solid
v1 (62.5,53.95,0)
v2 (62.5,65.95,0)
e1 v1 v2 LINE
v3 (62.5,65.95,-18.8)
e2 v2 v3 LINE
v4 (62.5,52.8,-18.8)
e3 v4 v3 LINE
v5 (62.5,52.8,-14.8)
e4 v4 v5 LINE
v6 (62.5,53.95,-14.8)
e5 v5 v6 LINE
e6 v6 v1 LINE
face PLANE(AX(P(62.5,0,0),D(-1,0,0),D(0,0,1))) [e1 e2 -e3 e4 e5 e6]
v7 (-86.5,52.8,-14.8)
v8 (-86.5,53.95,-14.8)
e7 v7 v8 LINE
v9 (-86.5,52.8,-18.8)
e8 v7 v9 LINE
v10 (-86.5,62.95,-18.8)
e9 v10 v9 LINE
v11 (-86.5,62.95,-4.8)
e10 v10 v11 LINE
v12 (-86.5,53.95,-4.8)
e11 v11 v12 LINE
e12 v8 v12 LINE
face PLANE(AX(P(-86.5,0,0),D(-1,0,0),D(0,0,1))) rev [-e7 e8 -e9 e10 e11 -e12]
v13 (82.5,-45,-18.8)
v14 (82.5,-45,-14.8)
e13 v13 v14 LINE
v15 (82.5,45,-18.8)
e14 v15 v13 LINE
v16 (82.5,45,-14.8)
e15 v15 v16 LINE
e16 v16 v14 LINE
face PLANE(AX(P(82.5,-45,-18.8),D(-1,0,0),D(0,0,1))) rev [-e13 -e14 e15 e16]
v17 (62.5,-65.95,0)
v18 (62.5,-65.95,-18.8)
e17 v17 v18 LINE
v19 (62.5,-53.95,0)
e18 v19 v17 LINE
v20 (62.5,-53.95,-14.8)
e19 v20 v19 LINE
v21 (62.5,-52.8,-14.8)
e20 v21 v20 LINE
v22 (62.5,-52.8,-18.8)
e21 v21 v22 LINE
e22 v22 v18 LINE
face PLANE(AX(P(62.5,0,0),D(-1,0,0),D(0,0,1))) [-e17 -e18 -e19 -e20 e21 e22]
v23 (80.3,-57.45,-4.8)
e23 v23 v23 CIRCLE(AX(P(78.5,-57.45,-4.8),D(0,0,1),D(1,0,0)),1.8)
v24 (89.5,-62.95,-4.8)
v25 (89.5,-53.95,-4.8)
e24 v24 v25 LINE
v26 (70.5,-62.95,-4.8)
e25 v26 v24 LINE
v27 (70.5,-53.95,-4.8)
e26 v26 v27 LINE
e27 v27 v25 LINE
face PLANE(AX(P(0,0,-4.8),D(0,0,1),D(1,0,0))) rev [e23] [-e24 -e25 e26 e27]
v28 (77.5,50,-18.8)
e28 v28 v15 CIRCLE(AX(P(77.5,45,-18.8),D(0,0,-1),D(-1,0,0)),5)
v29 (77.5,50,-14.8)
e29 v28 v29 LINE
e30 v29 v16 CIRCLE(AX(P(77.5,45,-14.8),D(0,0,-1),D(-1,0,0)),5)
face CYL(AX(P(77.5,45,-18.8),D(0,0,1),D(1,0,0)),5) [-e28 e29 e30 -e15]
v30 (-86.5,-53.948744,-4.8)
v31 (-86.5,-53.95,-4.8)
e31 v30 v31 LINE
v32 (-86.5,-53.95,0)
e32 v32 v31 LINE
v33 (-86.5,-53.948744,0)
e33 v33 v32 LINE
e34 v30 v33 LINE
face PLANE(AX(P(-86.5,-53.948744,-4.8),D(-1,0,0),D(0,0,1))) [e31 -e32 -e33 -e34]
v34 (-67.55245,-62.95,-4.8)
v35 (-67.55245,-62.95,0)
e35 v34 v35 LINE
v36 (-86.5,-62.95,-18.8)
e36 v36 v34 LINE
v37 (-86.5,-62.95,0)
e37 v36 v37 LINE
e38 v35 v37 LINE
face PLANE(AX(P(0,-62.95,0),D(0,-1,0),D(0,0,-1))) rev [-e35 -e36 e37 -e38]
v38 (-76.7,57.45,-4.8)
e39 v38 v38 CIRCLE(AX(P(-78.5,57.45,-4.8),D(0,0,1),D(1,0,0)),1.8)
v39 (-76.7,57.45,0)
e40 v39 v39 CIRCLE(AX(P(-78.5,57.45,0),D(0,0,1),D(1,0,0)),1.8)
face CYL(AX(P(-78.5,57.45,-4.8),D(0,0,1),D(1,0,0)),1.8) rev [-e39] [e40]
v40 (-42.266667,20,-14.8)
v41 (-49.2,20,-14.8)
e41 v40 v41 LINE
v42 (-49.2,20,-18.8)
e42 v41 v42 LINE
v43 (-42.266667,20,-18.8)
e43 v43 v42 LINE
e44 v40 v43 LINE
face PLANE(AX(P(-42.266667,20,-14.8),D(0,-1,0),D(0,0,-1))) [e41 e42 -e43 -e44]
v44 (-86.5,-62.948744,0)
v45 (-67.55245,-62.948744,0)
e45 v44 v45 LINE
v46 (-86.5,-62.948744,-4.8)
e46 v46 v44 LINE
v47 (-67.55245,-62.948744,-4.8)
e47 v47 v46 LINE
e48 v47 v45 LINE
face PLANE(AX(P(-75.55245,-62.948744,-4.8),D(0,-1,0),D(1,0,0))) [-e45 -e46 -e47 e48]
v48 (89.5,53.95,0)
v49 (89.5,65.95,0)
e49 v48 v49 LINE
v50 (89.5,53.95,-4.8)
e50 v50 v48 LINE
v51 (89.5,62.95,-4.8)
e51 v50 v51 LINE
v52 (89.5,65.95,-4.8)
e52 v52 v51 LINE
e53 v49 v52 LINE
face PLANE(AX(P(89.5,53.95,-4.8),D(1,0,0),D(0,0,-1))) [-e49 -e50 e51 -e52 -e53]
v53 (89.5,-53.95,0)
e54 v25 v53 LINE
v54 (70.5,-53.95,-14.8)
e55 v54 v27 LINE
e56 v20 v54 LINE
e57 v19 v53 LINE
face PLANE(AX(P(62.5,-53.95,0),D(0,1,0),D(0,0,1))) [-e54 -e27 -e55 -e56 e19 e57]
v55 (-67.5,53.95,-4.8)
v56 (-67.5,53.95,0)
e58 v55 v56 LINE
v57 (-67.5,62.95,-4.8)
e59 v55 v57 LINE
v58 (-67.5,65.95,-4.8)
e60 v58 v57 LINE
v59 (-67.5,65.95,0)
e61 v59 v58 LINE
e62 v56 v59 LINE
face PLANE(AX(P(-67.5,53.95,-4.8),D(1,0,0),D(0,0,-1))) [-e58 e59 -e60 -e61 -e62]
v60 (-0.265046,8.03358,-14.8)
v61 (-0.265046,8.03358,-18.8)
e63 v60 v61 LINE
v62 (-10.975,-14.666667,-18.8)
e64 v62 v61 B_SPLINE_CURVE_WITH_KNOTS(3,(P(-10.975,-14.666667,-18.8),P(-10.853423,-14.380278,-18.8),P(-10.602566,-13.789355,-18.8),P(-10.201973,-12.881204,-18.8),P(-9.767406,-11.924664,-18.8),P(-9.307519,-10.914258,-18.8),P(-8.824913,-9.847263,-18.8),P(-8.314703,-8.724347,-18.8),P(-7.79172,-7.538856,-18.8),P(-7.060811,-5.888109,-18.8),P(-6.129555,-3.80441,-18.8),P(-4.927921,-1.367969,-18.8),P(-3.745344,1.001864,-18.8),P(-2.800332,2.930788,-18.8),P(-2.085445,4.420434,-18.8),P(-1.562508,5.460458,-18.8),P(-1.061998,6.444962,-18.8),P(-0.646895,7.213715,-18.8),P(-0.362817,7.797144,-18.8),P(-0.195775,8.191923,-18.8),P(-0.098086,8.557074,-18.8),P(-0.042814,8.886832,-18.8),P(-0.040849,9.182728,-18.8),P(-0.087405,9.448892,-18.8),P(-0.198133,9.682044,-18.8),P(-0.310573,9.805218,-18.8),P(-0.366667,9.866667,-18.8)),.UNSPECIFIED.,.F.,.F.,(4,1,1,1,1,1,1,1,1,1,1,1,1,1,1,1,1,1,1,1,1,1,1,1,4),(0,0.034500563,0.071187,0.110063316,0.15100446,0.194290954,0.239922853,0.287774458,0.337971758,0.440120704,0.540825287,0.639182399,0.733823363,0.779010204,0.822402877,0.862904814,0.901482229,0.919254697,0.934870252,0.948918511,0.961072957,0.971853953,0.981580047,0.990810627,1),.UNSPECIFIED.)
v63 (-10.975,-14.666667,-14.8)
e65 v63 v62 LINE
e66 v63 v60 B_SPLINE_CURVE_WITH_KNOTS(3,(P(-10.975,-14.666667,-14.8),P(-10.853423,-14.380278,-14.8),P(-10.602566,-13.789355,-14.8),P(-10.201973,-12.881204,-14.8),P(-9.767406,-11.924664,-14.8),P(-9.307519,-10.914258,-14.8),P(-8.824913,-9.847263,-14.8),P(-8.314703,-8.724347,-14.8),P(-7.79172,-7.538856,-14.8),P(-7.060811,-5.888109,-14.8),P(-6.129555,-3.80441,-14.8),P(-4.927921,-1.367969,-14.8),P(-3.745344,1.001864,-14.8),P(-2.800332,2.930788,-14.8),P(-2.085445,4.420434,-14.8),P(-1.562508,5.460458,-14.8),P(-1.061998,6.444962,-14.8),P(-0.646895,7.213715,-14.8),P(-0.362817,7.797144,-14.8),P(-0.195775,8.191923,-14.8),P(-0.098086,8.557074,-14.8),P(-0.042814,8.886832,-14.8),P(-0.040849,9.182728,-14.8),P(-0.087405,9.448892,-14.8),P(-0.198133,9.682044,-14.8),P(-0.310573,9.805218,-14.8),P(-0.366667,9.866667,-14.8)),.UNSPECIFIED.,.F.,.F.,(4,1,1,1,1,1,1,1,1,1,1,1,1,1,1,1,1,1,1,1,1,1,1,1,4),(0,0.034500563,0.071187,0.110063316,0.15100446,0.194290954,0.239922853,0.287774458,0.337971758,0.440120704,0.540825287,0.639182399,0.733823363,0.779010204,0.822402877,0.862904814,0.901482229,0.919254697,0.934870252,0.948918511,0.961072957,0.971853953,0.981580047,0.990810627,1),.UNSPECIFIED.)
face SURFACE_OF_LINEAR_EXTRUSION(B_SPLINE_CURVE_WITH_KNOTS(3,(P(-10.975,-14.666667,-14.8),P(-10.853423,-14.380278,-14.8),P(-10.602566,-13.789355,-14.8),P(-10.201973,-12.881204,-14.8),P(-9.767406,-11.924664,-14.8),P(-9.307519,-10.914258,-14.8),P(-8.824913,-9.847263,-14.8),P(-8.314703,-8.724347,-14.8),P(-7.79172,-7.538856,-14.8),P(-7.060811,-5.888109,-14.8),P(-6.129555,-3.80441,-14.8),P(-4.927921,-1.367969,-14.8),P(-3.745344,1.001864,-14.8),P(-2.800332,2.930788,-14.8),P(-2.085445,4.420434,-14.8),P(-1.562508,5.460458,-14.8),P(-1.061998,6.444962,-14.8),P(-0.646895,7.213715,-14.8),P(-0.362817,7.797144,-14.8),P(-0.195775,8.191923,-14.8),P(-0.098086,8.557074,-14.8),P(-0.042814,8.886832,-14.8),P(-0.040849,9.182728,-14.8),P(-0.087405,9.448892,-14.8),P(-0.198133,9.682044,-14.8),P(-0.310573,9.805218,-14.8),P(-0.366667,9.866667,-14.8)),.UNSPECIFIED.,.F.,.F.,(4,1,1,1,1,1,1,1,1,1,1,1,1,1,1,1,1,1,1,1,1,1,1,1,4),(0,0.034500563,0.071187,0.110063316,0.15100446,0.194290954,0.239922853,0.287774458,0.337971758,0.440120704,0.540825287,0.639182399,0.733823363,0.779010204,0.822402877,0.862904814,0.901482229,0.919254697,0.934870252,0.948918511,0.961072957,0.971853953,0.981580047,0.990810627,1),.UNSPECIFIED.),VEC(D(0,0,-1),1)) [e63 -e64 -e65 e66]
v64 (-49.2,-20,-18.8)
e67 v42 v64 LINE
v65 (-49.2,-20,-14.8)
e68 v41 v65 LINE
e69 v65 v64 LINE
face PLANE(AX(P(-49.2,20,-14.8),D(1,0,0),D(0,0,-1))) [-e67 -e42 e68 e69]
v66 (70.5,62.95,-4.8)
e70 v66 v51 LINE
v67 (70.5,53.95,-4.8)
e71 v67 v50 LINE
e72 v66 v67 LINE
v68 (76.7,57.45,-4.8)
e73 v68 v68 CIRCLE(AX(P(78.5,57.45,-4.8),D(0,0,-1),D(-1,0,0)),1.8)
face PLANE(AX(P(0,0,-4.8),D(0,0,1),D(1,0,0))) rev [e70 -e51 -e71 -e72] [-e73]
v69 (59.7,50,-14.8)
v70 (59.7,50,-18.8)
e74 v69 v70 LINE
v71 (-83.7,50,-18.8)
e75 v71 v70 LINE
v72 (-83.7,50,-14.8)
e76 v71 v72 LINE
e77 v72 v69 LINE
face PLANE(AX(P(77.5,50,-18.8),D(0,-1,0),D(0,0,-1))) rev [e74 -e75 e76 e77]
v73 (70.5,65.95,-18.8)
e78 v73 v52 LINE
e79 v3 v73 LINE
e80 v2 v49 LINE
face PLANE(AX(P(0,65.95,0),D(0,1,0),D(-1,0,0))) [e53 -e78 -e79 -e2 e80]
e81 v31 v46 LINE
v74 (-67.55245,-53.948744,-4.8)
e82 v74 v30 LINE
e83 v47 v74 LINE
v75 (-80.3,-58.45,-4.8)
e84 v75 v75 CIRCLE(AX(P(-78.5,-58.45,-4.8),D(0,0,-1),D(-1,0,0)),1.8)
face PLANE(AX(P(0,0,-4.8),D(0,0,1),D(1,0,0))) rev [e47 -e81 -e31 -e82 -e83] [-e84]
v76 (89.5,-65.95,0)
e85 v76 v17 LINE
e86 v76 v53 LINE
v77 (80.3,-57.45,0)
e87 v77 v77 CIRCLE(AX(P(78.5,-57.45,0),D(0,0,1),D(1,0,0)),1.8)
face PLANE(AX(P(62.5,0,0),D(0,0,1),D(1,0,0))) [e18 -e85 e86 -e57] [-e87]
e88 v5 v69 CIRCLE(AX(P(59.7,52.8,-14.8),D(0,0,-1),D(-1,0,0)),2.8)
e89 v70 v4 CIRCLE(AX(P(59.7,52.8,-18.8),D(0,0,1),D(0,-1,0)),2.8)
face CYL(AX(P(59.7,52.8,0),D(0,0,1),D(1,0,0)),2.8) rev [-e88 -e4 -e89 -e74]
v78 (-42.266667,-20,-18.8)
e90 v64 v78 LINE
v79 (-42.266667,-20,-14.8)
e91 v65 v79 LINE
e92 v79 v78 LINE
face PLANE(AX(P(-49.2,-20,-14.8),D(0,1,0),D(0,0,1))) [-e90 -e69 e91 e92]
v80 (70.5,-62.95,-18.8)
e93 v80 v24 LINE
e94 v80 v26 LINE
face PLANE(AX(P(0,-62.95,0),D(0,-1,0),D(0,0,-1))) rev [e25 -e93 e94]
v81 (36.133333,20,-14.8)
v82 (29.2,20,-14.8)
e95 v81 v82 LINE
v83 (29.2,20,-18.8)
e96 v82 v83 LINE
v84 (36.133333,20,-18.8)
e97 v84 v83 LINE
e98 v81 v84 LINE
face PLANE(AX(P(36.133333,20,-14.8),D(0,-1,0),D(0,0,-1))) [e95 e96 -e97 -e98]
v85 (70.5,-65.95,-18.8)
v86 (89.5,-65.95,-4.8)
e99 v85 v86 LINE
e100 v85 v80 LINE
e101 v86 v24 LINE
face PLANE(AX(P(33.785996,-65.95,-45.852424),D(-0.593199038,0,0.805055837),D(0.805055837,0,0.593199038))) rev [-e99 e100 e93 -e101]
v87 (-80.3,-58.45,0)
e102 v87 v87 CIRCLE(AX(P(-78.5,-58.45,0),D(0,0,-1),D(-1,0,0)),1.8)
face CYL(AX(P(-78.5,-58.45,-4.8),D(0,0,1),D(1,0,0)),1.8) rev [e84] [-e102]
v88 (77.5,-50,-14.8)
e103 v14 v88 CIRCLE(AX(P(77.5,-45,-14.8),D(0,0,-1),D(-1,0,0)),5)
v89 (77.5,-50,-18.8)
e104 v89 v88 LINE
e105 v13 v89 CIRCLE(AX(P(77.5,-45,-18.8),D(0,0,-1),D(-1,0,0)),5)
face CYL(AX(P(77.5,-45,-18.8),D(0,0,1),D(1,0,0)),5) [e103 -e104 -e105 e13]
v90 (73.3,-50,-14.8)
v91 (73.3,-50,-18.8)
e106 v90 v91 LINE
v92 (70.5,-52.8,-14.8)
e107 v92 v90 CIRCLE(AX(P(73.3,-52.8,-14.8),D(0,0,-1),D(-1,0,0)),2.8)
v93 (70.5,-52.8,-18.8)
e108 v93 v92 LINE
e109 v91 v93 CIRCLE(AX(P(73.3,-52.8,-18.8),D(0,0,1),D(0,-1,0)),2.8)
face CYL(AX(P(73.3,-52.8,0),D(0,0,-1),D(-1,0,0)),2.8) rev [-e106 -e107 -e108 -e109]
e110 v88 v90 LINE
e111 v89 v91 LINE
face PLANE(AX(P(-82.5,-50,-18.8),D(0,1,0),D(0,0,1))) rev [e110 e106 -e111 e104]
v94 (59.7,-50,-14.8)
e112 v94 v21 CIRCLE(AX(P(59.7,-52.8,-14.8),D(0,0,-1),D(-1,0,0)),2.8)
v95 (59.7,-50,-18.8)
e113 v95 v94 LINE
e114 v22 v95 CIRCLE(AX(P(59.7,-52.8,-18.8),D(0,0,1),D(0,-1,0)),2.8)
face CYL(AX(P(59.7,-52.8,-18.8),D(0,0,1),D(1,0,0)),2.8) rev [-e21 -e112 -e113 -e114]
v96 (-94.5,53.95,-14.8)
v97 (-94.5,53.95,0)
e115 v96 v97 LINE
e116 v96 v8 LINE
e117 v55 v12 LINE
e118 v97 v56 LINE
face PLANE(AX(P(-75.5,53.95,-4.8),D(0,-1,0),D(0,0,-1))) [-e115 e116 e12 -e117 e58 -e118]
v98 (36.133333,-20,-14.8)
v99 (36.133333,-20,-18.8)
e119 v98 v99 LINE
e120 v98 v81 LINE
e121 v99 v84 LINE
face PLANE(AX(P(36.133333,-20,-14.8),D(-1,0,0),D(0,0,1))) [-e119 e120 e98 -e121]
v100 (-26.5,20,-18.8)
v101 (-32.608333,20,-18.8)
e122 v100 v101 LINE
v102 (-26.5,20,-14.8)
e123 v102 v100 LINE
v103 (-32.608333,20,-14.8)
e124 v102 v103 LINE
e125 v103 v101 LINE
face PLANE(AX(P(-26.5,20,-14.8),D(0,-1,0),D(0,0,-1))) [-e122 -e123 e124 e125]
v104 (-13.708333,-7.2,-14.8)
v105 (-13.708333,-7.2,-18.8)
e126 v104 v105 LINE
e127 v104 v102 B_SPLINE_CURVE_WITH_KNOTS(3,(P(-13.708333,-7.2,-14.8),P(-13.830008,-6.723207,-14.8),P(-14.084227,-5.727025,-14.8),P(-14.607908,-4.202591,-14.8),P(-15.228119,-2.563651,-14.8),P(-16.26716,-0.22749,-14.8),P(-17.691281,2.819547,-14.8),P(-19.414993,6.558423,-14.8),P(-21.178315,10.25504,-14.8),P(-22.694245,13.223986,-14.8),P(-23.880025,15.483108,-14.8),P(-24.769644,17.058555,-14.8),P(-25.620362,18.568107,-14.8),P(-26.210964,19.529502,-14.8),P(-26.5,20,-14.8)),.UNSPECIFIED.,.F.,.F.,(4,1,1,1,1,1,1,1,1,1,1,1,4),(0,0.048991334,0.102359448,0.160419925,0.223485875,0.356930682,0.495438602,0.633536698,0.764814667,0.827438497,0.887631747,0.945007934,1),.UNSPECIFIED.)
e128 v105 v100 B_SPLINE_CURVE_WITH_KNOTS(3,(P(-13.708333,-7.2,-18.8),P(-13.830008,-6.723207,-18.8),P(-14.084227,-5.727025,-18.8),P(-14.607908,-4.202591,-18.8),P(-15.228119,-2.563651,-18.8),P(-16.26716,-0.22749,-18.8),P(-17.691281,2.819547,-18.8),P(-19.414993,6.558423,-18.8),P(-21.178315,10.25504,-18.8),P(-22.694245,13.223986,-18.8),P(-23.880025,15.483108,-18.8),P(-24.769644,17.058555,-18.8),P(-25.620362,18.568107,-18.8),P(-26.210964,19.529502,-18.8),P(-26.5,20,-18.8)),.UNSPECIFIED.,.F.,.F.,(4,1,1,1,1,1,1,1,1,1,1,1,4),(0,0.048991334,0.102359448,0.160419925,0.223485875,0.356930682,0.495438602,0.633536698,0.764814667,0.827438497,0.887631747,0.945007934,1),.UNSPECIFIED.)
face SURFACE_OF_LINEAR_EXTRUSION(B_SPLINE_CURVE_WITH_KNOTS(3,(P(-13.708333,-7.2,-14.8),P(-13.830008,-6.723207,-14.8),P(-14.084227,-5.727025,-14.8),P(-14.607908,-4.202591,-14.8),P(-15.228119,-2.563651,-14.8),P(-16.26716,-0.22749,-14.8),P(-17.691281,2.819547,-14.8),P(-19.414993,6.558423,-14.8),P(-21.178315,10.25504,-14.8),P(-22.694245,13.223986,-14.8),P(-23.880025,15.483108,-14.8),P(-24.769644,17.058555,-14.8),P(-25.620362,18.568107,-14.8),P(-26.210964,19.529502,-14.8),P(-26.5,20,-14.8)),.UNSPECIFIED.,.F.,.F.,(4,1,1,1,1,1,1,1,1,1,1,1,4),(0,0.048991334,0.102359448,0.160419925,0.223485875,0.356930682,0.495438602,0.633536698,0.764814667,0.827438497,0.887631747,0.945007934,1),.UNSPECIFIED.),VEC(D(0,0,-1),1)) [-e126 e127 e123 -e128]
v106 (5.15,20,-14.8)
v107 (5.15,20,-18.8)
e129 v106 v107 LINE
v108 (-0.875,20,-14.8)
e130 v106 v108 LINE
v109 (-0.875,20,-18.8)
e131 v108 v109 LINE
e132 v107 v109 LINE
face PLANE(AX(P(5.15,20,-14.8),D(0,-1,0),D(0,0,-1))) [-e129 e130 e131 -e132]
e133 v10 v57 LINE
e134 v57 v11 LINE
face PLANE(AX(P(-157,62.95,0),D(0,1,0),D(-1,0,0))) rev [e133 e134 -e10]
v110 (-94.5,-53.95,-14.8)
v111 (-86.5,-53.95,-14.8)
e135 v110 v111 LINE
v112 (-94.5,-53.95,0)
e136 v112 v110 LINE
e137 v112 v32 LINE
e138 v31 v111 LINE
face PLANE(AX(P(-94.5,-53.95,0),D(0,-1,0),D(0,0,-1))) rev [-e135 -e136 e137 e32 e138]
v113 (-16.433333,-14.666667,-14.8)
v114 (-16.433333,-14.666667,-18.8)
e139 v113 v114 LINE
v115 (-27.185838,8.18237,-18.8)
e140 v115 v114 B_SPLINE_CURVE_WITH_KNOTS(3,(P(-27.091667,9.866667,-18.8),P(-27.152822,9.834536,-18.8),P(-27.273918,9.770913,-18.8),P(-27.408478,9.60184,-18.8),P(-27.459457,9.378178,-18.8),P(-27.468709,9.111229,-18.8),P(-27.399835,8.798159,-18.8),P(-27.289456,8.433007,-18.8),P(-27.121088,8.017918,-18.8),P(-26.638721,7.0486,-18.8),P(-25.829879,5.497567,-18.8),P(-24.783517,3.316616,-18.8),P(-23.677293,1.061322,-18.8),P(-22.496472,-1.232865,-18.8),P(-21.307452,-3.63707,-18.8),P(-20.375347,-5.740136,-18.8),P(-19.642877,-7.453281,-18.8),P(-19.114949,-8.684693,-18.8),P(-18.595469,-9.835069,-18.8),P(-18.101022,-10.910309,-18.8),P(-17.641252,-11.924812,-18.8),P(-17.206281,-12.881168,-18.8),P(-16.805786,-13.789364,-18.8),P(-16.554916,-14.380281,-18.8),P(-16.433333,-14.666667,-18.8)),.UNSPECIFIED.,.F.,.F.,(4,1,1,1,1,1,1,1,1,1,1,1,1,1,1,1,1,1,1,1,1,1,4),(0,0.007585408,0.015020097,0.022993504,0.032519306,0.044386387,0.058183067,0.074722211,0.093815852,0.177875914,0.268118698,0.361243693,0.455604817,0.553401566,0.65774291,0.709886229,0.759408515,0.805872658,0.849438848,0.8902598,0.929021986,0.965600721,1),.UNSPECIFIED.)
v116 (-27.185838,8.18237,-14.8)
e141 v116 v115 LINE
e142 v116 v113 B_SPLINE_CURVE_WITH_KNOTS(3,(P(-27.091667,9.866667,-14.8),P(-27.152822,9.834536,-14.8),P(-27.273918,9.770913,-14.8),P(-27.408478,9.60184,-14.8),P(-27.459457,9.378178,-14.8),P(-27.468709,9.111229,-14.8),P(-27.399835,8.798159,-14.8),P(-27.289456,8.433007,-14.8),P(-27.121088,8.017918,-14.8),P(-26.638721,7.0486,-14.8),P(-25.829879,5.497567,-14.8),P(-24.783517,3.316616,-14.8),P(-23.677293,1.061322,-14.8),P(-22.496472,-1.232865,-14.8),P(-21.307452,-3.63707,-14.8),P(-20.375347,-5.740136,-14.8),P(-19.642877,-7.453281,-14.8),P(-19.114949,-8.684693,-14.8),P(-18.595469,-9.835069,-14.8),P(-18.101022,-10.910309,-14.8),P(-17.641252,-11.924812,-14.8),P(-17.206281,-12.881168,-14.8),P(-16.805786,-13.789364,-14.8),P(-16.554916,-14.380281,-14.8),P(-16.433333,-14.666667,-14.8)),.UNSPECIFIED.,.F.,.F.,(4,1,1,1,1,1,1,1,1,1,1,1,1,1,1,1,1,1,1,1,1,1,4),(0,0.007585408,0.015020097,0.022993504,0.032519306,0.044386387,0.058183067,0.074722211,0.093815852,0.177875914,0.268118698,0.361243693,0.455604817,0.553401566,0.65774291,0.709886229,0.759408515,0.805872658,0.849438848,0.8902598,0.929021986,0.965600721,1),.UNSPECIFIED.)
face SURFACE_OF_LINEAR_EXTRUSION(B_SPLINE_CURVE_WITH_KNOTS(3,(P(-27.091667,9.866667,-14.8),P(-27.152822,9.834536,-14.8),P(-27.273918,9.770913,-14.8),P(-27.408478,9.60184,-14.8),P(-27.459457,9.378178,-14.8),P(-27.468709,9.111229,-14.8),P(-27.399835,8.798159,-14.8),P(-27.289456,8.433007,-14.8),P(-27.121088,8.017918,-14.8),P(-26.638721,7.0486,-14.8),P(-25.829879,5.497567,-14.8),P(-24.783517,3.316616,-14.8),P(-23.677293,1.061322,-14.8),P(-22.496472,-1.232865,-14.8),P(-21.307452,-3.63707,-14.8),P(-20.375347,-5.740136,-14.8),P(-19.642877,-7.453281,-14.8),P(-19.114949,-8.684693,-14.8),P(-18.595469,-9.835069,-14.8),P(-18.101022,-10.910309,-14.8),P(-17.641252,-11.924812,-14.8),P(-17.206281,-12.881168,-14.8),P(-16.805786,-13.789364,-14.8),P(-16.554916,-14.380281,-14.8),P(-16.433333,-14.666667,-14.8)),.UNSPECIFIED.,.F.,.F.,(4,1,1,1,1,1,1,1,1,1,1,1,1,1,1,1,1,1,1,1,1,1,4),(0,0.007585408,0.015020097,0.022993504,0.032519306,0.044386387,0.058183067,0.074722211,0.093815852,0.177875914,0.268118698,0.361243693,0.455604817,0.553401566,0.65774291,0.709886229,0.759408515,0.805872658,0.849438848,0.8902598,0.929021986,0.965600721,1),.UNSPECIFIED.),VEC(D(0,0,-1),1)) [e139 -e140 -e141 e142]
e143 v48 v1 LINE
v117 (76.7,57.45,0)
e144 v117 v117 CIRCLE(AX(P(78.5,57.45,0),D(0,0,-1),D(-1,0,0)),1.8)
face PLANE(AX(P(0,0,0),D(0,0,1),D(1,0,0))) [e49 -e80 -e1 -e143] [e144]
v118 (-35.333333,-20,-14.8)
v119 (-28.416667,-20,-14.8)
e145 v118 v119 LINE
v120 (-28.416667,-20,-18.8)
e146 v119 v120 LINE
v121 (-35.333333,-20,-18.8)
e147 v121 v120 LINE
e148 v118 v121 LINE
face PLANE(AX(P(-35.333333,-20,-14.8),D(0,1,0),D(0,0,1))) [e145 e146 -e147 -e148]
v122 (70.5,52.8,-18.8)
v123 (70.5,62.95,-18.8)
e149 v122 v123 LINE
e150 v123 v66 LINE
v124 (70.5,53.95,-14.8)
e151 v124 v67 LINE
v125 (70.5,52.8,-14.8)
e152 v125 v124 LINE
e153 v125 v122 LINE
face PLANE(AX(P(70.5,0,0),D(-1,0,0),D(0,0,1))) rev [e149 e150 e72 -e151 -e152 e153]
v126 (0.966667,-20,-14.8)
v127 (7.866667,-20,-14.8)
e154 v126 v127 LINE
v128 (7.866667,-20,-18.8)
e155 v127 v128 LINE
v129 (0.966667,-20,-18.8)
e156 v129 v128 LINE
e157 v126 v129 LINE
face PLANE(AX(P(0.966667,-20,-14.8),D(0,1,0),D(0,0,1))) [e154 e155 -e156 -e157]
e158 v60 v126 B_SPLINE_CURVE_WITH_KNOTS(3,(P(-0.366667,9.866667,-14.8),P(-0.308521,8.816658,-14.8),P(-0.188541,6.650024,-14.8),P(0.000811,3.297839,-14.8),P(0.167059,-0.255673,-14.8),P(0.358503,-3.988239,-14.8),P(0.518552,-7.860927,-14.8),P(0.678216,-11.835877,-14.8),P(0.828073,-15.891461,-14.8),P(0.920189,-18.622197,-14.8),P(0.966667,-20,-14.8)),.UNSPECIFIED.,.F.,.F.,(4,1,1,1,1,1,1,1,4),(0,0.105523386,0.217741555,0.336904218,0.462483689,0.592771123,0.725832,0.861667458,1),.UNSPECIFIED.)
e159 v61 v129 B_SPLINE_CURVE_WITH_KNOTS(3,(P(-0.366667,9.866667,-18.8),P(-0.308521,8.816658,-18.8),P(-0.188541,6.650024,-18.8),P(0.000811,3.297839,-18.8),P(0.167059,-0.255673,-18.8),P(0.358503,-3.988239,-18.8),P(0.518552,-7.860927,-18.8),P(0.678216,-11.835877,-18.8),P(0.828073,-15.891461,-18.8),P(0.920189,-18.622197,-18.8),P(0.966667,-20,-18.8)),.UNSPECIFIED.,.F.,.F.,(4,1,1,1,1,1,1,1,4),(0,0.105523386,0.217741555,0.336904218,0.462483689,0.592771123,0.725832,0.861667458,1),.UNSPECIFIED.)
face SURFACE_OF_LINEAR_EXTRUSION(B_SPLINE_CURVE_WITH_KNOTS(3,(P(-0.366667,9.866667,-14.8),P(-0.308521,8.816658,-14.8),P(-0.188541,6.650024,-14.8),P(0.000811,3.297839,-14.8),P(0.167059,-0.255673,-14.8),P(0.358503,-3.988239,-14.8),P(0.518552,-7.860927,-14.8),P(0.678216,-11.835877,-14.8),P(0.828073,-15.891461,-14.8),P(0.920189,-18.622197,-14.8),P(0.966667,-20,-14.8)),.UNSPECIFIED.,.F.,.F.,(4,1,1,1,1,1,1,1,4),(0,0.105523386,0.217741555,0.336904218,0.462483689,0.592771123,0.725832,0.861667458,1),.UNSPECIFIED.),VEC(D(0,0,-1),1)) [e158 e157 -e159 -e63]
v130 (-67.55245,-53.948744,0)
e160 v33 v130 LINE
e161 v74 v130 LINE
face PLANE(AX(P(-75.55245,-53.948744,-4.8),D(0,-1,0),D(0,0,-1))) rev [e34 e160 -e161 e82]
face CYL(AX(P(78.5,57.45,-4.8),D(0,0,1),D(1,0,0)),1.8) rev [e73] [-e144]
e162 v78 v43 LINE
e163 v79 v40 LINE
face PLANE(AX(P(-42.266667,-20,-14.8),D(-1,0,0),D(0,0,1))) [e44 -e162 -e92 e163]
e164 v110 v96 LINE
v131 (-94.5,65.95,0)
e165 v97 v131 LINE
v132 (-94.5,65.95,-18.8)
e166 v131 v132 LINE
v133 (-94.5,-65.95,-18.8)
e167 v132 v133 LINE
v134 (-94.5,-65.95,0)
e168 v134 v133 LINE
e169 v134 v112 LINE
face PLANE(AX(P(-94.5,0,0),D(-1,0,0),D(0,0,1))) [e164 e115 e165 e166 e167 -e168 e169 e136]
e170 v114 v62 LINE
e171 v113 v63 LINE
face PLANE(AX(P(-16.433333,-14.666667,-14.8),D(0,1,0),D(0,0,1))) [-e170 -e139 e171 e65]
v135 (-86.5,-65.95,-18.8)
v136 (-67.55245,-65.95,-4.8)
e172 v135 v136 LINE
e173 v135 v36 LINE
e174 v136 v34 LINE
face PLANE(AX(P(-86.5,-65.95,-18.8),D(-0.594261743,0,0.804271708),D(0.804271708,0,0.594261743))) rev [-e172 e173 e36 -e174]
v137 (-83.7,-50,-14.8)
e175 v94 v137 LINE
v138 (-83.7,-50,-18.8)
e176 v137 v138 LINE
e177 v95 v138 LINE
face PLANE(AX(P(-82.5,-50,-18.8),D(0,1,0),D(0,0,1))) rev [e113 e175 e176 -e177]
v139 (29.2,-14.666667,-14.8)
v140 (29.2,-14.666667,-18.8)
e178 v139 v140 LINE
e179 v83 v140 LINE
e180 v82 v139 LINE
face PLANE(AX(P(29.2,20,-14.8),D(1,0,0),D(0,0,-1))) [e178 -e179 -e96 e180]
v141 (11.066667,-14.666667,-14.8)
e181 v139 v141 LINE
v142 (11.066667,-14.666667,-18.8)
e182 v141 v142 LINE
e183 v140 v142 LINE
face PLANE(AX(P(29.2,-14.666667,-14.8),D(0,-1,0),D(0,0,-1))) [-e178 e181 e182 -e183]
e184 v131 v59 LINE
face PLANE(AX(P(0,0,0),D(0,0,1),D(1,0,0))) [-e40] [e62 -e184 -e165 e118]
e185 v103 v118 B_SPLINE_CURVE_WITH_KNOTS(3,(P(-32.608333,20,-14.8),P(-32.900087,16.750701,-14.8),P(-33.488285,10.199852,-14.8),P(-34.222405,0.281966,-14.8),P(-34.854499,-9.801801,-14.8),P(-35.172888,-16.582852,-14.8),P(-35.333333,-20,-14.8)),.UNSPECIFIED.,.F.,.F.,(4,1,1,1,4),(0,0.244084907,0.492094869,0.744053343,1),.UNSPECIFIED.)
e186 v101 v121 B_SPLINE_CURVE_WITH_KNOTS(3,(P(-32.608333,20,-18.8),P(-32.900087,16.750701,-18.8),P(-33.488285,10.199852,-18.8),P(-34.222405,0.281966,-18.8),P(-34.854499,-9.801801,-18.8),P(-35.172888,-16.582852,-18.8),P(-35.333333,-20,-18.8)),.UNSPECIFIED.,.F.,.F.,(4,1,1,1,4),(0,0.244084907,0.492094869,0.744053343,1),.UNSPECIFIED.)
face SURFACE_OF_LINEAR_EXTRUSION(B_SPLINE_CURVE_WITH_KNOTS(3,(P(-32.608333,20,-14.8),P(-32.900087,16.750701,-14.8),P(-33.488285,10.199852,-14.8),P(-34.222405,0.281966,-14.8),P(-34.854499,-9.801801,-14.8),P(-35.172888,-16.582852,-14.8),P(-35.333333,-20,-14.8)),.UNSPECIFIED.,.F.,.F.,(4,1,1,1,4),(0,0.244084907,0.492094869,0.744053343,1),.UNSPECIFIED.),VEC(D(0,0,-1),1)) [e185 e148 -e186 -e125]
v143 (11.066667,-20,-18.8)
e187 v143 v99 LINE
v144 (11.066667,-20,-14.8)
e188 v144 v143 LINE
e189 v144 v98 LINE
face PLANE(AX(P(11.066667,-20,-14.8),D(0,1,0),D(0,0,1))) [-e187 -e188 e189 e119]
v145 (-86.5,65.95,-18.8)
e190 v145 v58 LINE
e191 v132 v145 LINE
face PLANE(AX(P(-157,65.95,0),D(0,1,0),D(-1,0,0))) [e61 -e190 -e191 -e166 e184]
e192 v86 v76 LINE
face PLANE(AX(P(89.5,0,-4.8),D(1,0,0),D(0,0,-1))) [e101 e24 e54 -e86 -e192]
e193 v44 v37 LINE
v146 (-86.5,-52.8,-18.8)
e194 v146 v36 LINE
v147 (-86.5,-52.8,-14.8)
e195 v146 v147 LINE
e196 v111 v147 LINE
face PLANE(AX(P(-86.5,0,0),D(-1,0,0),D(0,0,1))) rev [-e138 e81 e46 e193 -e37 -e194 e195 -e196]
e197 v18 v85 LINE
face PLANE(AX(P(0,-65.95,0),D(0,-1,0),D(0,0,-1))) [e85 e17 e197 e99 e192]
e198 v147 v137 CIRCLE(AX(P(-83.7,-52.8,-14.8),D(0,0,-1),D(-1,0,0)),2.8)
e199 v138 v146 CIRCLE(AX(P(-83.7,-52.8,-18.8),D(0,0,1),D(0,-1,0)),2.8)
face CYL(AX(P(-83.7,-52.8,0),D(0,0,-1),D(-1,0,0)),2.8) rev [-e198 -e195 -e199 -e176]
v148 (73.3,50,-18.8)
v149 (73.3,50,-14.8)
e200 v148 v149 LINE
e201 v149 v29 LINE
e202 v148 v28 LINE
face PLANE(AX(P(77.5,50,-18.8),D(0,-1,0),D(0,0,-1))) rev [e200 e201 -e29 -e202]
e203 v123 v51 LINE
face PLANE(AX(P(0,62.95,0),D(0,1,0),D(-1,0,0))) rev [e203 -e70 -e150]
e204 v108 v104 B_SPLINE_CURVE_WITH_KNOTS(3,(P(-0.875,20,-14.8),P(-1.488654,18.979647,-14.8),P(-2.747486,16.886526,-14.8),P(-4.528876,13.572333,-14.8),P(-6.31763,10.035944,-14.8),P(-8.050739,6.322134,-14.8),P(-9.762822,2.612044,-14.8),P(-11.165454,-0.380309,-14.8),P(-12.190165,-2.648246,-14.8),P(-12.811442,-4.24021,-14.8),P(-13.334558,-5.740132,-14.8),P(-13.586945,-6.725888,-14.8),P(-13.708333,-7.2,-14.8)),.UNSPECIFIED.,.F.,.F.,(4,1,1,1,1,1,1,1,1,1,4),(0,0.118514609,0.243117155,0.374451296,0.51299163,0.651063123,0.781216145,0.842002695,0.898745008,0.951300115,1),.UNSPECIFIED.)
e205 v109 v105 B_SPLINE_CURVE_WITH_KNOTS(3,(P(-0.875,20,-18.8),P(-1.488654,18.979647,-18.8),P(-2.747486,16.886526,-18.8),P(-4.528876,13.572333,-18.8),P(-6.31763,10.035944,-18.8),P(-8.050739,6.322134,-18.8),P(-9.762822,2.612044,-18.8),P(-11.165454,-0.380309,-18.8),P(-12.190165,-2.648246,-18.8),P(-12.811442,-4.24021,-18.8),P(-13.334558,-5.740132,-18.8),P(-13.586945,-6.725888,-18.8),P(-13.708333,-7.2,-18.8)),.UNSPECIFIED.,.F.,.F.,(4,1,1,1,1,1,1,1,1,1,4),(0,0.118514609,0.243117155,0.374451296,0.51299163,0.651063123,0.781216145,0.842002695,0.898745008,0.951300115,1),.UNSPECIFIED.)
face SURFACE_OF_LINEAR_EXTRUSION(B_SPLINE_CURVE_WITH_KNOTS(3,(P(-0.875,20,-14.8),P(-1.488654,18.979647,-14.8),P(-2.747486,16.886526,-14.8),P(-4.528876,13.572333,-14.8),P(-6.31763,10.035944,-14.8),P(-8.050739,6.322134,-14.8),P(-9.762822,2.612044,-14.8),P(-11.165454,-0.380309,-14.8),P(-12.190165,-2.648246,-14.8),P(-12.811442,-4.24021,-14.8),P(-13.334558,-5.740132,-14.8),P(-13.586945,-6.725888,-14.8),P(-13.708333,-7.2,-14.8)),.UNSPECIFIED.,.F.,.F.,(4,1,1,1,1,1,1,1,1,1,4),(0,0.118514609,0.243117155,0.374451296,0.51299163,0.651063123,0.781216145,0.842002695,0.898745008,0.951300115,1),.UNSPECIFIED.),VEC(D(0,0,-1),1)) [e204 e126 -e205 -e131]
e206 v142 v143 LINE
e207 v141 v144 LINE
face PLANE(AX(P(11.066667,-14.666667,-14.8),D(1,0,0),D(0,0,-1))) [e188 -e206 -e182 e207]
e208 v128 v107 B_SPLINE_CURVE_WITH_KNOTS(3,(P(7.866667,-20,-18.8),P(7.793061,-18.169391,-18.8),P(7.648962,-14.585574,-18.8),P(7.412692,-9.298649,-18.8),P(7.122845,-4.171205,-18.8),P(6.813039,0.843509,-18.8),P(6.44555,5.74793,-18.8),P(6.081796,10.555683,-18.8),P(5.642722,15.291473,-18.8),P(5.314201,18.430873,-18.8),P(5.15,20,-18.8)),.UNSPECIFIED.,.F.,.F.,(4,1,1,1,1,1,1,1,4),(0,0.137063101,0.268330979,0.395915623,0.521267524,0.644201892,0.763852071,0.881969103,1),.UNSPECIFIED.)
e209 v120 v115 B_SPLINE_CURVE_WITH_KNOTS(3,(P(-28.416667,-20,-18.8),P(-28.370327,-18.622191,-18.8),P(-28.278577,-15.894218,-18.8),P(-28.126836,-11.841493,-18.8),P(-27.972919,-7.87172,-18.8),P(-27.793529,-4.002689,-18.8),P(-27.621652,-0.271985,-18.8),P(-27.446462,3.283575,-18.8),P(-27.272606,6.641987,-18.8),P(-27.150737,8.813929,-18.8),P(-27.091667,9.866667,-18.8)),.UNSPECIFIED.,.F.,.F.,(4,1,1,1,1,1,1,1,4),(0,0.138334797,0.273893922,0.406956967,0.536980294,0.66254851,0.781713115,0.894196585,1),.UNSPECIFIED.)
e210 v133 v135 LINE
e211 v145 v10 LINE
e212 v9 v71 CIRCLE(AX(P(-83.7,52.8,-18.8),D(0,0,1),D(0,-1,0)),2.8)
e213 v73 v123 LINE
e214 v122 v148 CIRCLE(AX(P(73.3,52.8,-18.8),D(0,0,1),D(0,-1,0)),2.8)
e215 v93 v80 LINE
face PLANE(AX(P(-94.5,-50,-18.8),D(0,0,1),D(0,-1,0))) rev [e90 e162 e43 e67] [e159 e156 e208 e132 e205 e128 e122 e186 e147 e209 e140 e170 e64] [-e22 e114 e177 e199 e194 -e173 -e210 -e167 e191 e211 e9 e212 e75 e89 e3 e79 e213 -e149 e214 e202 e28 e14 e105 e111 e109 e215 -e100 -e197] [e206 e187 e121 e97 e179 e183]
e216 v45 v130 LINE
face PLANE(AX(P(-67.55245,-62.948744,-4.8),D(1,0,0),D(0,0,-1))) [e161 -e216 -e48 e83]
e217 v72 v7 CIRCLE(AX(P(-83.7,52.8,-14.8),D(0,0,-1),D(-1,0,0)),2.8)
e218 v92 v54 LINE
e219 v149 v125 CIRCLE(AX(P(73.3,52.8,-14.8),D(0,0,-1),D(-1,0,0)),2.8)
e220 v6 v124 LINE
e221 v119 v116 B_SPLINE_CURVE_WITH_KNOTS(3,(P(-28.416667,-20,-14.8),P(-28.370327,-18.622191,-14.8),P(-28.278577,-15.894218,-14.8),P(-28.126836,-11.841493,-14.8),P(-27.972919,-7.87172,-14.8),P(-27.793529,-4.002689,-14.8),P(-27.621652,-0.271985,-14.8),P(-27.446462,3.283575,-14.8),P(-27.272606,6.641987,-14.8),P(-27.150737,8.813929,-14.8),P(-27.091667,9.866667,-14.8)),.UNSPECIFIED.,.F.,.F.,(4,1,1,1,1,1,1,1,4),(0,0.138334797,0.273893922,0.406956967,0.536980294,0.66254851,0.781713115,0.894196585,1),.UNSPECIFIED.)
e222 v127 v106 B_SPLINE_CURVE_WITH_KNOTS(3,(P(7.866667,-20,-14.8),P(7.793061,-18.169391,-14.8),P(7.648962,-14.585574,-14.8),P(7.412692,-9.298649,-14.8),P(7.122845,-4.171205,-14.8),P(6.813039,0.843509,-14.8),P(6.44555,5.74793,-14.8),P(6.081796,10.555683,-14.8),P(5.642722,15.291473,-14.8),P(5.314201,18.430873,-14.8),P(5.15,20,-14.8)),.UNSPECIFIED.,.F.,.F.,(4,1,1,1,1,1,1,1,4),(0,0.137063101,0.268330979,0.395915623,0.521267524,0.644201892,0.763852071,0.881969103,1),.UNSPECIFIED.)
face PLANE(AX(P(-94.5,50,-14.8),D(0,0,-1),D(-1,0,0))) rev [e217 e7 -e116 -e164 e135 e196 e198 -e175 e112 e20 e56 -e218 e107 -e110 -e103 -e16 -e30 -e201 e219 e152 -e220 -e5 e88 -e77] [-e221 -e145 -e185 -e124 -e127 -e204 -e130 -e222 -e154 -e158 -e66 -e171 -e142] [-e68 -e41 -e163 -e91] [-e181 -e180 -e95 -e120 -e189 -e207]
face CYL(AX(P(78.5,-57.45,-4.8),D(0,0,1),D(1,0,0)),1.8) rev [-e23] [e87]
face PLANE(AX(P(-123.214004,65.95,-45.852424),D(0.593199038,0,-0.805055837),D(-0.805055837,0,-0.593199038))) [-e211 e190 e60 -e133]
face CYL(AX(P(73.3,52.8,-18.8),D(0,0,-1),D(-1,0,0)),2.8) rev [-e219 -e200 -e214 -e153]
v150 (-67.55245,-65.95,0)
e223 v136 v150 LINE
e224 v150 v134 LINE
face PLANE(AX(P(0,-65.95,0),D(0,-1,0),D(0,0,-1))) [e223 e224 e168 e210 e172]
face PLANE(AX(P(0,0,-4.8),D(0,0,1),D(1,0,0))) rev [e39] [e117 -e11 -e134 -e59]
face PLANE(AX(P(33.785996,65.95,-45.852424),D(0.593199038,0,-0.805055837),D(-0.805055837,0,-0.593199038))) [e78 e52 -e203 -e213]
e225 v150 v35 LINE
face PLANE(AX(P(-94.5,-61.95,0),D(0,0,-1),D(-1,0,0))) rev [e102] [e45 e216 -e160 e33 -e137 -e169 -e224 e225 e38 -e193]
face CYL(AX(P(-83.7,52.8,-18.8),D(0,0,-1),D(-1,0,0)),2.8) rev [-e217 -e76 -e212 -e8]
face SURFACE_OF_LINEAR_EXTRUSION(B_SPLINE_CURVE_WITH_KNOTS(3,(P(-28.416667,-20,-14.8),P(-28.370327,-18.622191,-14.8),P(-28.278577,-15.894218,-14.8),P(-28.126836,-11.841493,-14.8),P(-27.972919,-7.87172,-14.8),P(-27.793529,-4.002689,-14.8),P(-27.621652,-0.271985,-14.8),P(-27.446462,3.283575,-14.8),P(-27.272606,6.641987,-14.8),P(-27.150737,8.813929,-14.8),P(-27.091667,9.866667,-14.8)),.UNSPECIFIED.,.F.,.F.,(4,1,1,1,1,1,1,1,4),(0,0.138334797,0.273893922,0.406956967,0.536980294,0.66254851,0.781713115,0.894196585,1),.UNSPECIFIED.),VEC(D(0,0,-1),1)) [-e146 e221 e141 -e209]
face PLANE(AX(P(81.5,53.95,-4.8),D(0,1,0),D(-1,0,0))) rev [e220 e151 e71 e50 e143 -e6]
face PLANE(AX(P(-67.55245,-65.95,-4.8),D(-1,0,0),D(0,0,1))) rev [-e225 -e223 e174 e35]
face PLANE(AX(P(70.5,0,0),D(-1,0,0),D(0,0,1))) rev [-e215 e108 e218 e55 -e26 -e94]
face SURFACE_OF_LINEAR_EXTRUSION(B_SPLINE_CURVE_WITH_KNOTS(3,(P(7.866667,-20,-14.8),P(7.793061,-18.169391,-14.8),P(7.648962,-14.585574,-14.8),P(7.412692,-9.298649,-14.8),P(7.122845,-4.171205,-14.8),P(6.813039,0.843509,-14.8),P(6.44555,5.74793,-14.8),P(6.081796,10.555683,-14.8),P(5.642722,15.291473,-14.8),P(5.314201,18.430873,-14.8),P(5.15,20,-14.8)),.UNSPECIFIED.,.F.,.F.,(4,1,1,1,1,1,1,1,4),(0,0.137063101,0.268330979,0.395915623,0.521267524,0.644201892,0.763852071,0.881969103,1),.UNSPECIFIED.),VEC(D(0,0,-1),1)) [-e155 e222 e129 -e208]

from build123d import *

# Parameters (mm, degrees)
SKETCH1_W              = 19
SKETCH1_H              = 9
SKETCH1_R              = 1.8
BOSS_EXTRUDE1_DEPTH    = 4.8
BOSS_EXTRUDE1_2_DEPTH  = 4.8
BOSS_EXTRUDE1_3_DEPTH  = 4.8
SKETCH1_W_2            = 18.947549714
BOSS_EXTRUDE1_4_DEPTH  = 4.8
BOSS_EXTRUDE2_DEPTH    = 4
BOSS_EXTRUDE3_DEPTH    = 8
BOSS_EXTRUDE4_DEPTH    = 8
FILLET1_R              = 2.8
SKETCH11_W             = 19
SKETCH11_H             = 4.8
BOSS_EXTRUDE5_DEPTH    = 3
BOSS_EXTRUDE6_DEPTH    = 3
LPATTERN1_COUNT        = 2
LPATTERN1_PITCH        = 157
CUT_EXTRUDE2_START     = -4
CUT_EXTRUDE2_OUTLINE_W = 6.933333333
CUT_EXTRUDE2_OUTLINE_H = 40
CUT_EXTRUDE2_DEPTH     = 4
SKETCH12_W             = 19
SKETCH12_H             = 4.8
BOSS_EXTRUDE7_DEPTH    = 3
SKETCH12_4_W           = 8
SKETCH12_4_H           = 18.8
BOSS_EXTRUDE9_DEPTH    = 3


# Read off the part's stored shape, not the designer's step: Cut-Extrude2
with BuildPart() as part:
    # Sketch1 → Boss-Extrude1 (new body)
    with BuildSketch(Plane.XY):
        with Locations((80, 58.45)):
            Rectangle(SKETCH1_W, SKETCH1_H)
        with Locations(Location((78.5, 57.45, 0), (0, 0, 180))):
            Circle(SKETCH1_R, mode=Mode.SUBTRACT)
    extrude(amount=-BOSS_EXTRUDE1_DEPTH)



with BuildPart() as body_2:
    # Sketch1 → Boss-Extrude1 2 (new body)
    with BuildSketch(Plane.XY):
        with Locations((80, -58.45)):
            Rectangle(SKETCH1_W, SKETCH1_H)
        with Locations((78.5, -57.45)):
            Circle(SKETCH1_R, mode=Mode.SUBTRACT)
    extrude(amount=-BOSS_EXTRUDE1_2_DEPTH)

    # Sketch12 → Boss-Extrude7 (add)
    with BuildSketch(Plane.XZ.offset(62.95)):
        Polygon((70.5, -4.8), (70.5, 0), (62.5, 0), (62.5, -18.8), (70.5, -18.8), align=None)
        Polygon((70.5, -18.8), (89.5, -4.8), (70.5, -4.8), align=None)
        with Locations((80, -2.4)):
            Rectangle(SKETCH12_W, SKETCH12_H)
        Polygon((-86.5, -18.8), (-67.552450286, -4.8), (-67.552450286, 0), (-94.5, 0), (-94.5, -18.8), align=None)
    extrude(amount=BOSS_EXTRUDE7_DEPTH)


with BuildPart() as body_3:
    # Sketch1 → Boss-Extrude1 3 (new body)
    with BuildSketch(Plane.XY):
        with Locations((-77, 58.45)):
            Rectangle(SKETCH1_W, SKETCH1_H)
        with Locations((-78.5, 57.45)):
            Circle(SKETCH1_R, mode=Mode.SUBTRACT)
    extrude(amount=-BOSS_EXTRUDE1_3_DEPTH)


with BuildPart() as body_4:
    # Sketch1 → Boss-Extrude1 4 (new body)
    with BuildSketch(Plane.XY):
        with Locations((-77.026225143, -58.448744181)):
            Rectangle(SKETCH1_W_2, SKETCH1_H)
        with Locations(Location((-78.5, -58.45, 0), (0, 0, 180))):
            Circle(SKETCH1_R, mode=Mode.SUBTRACT)
    extrude(amount=-BOSS_EXTRUDE1_4_DEPTH)


with BuildPart() as body_5:
    # Sketch3 → Boss-Extrude2 (new body)
    with BuildSketch(Plane(origin=(0, 0, -14.8), x_dir=(-1, 0, 0), z_dir=(0, 0, -1))):
        with BuildLine():
            Line((-77.5, -50), (82.5, -50))
            Line((82.5, -50), (86.5, -50))
            Line((86.5, -50), (86.5, 50))
            Line((86.5, 50), (82.5, 50))
            Line((82.5, 50), (-77.5, 50))
            ThreePointArc((-77.5, 50), (-81.035533906, 48.535533906), (-82.5, 45))
            Line((-82.5, 45), (-82.5, -45))
            ThreePointArc((-82.5, -45), (-81.035533906, -48.535533906), (-77.5, -50))
        make_face()
    extrude(amount=BOSS_EXTRUDE2_DEPTH)


with BuildPart() as part_1:
    add(part.part)

    add(body_5.part)  # Boss-Extrude3 merges body 5
    # Sketch4 → Boss-Extrude3 (add)
    with BuildSketch(Plane.ZY.offset(-70.5)):
        Polygon((-18.8, 61.95), (-18.8, 50), (-14.8, 50), (-14.8, 53.95), (0, 53.95), (0, 61.95), align=None)
    boss_extrude3 = extrude(amount=BOSS_EXTRUDE3_DEPTH)

    # Mirror4: Boss-Extrude3 across plane
    add(boss_extrude3.mirror(Plane.ZX))


    add(body_3.part)  # Boss-Extrude4 merges body 3

    add(body_4.part)  # Boss-Extrude4 merges body 4
    # Sketch10 → Boss-Extrude4 (add)
    with BuildSketch(Plane.ZY.offset(86.5)):
        Polygon((-14.8, 50), (-14.8, 26.95), (-14.8, -50), (-14.8, -53.95), (0, -53.95), (0, -61.95), (-18.8, -61.95), (-18.8, -50), (-18.8, 26.95), (-18.8, 50), (-18.8, 61.95), (0, 61.95), (0, 53.95), (-14.8, 53.95), align=None)
    extrude(amount=BOSS_EXTRUDE4_DEPTH)

    # Fillet1
    fillet1_edges = [part_1.edges().sort_by_distance(p)[0] for p in [
        (62.5, 50, -16.8),
        (70.5, 50, -16.8),
        (-86.5, 50, -16.8),
        (62.5, -50, -16.8),
        (-86.5, -50, -16.8),
        (70.5, -50, -16.8),
    ]]
    fillet(fillet1_edges, radius=FILLET1_R)

    # Sketch11 → Boss-Extrude5 (add)
    with BuildSketch(Plane(origin=(0, 62.95, 0), x_dir=(1, 0, 0), z_dir=(0, 1, 0))):
        with Locations((80, 2.4)):
            Rectangle(SKETCH11_W, SKETCH11_H)
        Polygon((89.5, 4.8), (70.5, 18.8), (70.5, 4.8), align=None)
    boss_extrude5 = extrude(amount=BOSS_EXTRUDE5_DEPTH)

    # Sketch11<5> → Boss-Extrude6 (add, symmetric)
    with BuildSketch(Plane(origin=(0, 62.95, 0), x_dir=(1, 0, 0), z_dir=(0, 1, 0))):
        Polygon((62.5, 18.8), (62.5, 0), (70.5, 0), (70.5, 4.8), (70.5, 18.8), align=None)
    boss_extrude6 = extrude(amount=BOSS_EXTRUDE6_DEPTH, both=True)

    # LPattern1: Boss-Extrude5, Boss-Extrude6 ×2
    with Locations(*[(-i * LPATTERN1_PITCH, 0, 0) for i in range(1, LPATTERN1_COUNT)]):
        add(boss_extrude5)
        add(boss_extrude6)

    # Cut-Extrude2 outline → Cut-Extrude2 (cut)
    with BuildSketch(Plane(origin=(0, 0, -18.8), x_dir=(-1, 0, 0), z_dir=(0, 0, -1)).offset(CUT_EXTRUDE2_START)):
        with BuildLine():
            add(Edge.make_bspline(
                [(10.975, -14.666666667), (10.853422825, -14.380277897), (10.602565639, -13.789355455), (10.2019734, -12.881204225), (9.767405766, -11.924663917), (9.307519179, -10.914258143), (8.824913039, -9.84726331), (8.314703241, -8.72434694), (7.79171958, -7.538855775), (7.060810636, -5.888109041), (6.129555226, -3.804410061), (4.927921427, -1.367968701), (3.745344455, 1.001863959), (2.800332488, 2.930787983), (2.085444913, 4.420434389), (1.562508134, 5.460457627), (1.061997748, 6.444961947), (0.646894723, 7.213714992), (0.390028809, 7.741258394), (0.294400491, 7.960576425), (0.265045842, 8.033579646)],
                knots=[0, 0, 0, 0, 0.034500563, 0.071187, 0.110063316, 0.15100446, 0.194290954, 0.239922853, 0.287774458, 0.337971758, 0.440120704, 0.540825287, 0.639182399, 0.733823363, 0.779010204, 0.822402877, 0.862904814, 0.901482229, 0.919254697, 0.927976768, 0.927976768, 0.927976768, 0.927976768], degree=3))
            Line((10.975, -14.666666667), (16.433333333, -14.666666667))
            add(Edge.make_bspline(
                [(27.185837823, 8.182370431), (27.16617885, 8.135201447), (27.077190149, 7.929706006), (26.638721231, 7.048600418), (25.829878755, 5.497567499), (24.783516915, 3.316615567), (23.677292972, 1.061322281), (22.496472017, -1.232864568), (21.307452474, -3.637070323), (20.375347087, -5.74013551), (19.642877201, -7.45328115), (19.114948929, -8.684692719), (18.595469257, -9.83506941), (18.101022183, -10.910308731), (17.641251792, -11.924811954), (17.206280513, -12.881167962), (16.805785724, -13.789363687), (16.554916393, -14.380280585), (16.433333333, -14.666666667)],
                knots=[0.069075624, 0.069075624, 0.069075624, 0.069075624, 0.074722211, 0.093815852, 0.177875914, 0.268118698, 0.361243693, 0.455604817, 0.553401566, 0.65774291, 0.709886229, 0.759408515, 0.805872658, 0.849438848, 0.8902598, 0.929021986, 0.965600721, 1, 1, 1, 1], degree=3))
            add(Edge.make_bspline(
                [(28.416666667, -20), (28.370326707, -18.622190652), (28.278576595, -15.894217539), (28.126835921, -11.841493191), (27.972919305, -7.871719916), (27.793529228, -4.002689262), (27.621652056, -0.271985015), (27.446461619, 3.283575307), (27.301676648, 6.080429142), (27.213112404, 7.691042727), (27.185837823, 8.182370431)],
                knots=[0, 0, 0, 0, 0.138334797, 0.273893922, 0.406956967, 0.536980294, 0.66254851, 0.781713115, 0.894196585, 0.943574943, 0.943574943, 0.943574943, 0.943574943], degree=3))
            Line((28.416666667, -20), (35.333333333, -20))
            add(Edge.make_bspline(
                [(32.608333333, 20), (32.900086832, 16.750700945), (33.488285429, 10.199851855), (34.22240543, 0.281966095), (34.854498798, -9.801801427), (35.172888466, -16.58285171), (35.333333333, -20)],
                knots=[0, 0, 0, 0, 0.244084907, 0.492094869, 0.744053343, 1, 1, 1, 1], degree=3))
            Line((32.608333333, 20), (26.5, 20))
            add(Edge.make_bspline(
                [(13.708333333, -7.2), (13.830007974, -6.723206803), (14.084227403, -5.727024743), (14.60790834, -4.202590997), (15.228118515, -2.563650948), (16.267159704, -0.227490136), (17.691281094, 2.819546572), (19.414993101, 6.558422585), (21.178315261, 10.255040247), (22.694244718, 13.223986219), (23.88002457, 15.483108195), (24.769643789, 17.058555357), (25.620362017, 18.56810669), (26.210964283, 19.529501548), (26.5, 20)],
                knots=[0, 0, 0, 0, 0.048991334, 0.102359448, 0.160419925, 0.223485875, 0.356930682, 0.495438602, 0.633536698, 0.764814667, 0.827438497, 0.887631747, 0.945007934, 1, 1, 1, 1], degree=3))
            add(Edge.make_bspline(
                [(0.875, 20), (1.488654305, 18.979646564), (2.747485512, 16.886525506), (4.528875905, 13.57233268), (6.317629783, 10.03594448), (8.05073889, 6.322134495), (9.762822193, 2.612044415), (11.165454408, -0.380308514), (12.190165242, -2.648246106), (12.811441851, -4.240209855), (13.334558303, -5.740131954), (13.586944811, -6.725888004), (13.708333333, -7.2)],
                knots=[0, 0, 0, 0, 0.118514609, 0.243117155, 0.374451296, 0.51299163, 0.651063123, 0.781216145, 0.842002695, 0.898745008, 0.951300115, 1, 1, 1, 1], degree=3))
            Line((0.875, 20), (-5.15, 20))
            add(Edge.make_bspline(
                [(-7.866666667, -20), (-7.793061043, -18.169390935), (-7.648961945, -14.585573542), (-7.412691767, -9.29864876), (-7.122844657, -4.171204641), (-6.81303939, 0.843509011), (-6.445549688, 5.747929795), (-6.081795853, 10.555682601), (-5.642721893, 15.291472548), (-5.314200688, 18.430872547), (-5.15, 20)],
                knots=[0, 0, 0, 0, 0.137063101, 0.268330979, 0.395915623, 0.521267524, 0.644201892, 0.763852071, 0.881969103, 1, 1, 1, 1], degree=3))
            Line((-7.866666667, -20), (-0.966666667, -20))
            add(Edge.make_bspline(
                [(0.265045842, 8.033579646), (0.240657124, 7.594605286), (0.154028006, 6.039024937), (-0.000810917, 3.297839119), (-0.167059263, -0.255673004), (-0.358502841, -3.988239018), (-0.518551576, -7.860926765), (-0.678215675, -11.835877361), (-0.828073098, -15.891460777), (-0.92018915, -18.622196537), (-0.966666667, -20)],
                knots=[0.061407132, 0.061407132, 0.061407132, 0.061407132, 0.105523386, 0.217741555, 0.336904218, 0.462483689, 0.592771123, 0.725832, 0.861667458, 1, 1, 1, 1], degree=3))
        make_face()
        with Locations((45.733333333, 0)):
            Rectangle(CUT_EXTRUDE2_OUTLINE_W, CUT_EXTRUDE2_OUTLINE_H)
        Polygon((-29.2, 20), (-36.133333333, 20), (-36.133333333, -20), (-11.066666667, -20), (-11.066666667, -14.666666667), (-29.2, -14.666666667), align=None)
    extrude(amount=CUT_EXTRUDE2_DEPTH, mode=Mode.SUBTRACT)



with BuildPart() as boss_extrude7_piece_1:
    # of the separate pieces the step leaves, piece 1, a body of its own (boss_extrude7_pieces)
    add(body_2.part.solids().sort_by_distance((89.5, -53.95, 0))[0])


with BuildPart() as boss_extrude7_piece_2:
    # of the separate pieces the step leaves, piece 2, a body of its own (boss_extrude7_pieces)
    add(body_2.part.solids().sort_by_distance((-86.5, -62.95, -18.8))[0])


with BuildPart() as part_2:
    add(part_1.part)

    add(boss_extrude7_piece_1.part)  # Boss-Extrude9 merges Boss-Extrude7 piece 1

    add(boss_extrude7_piece_2.part)  # Boss-Extrude9 merges Boss-Extrude7 piece 2
    # Sketch12<4> → Boss-Extrude9 (add)
    with BuildSketch(Plane.XZ.offset(62.95)):
        with Locations((-90.5, -9.4)):
            Rectangle(SKETCH12_4_W, SKETCH12_4_H)
        Polygon((70.5, -4.8), (70.5, 0), (62.5, 0), (62.5, -18.8), (70.5, -18.8), align=None)
    extrude(amount=-BOSS_EXTRUDE9_DEPTH)


solid = part_2.part
